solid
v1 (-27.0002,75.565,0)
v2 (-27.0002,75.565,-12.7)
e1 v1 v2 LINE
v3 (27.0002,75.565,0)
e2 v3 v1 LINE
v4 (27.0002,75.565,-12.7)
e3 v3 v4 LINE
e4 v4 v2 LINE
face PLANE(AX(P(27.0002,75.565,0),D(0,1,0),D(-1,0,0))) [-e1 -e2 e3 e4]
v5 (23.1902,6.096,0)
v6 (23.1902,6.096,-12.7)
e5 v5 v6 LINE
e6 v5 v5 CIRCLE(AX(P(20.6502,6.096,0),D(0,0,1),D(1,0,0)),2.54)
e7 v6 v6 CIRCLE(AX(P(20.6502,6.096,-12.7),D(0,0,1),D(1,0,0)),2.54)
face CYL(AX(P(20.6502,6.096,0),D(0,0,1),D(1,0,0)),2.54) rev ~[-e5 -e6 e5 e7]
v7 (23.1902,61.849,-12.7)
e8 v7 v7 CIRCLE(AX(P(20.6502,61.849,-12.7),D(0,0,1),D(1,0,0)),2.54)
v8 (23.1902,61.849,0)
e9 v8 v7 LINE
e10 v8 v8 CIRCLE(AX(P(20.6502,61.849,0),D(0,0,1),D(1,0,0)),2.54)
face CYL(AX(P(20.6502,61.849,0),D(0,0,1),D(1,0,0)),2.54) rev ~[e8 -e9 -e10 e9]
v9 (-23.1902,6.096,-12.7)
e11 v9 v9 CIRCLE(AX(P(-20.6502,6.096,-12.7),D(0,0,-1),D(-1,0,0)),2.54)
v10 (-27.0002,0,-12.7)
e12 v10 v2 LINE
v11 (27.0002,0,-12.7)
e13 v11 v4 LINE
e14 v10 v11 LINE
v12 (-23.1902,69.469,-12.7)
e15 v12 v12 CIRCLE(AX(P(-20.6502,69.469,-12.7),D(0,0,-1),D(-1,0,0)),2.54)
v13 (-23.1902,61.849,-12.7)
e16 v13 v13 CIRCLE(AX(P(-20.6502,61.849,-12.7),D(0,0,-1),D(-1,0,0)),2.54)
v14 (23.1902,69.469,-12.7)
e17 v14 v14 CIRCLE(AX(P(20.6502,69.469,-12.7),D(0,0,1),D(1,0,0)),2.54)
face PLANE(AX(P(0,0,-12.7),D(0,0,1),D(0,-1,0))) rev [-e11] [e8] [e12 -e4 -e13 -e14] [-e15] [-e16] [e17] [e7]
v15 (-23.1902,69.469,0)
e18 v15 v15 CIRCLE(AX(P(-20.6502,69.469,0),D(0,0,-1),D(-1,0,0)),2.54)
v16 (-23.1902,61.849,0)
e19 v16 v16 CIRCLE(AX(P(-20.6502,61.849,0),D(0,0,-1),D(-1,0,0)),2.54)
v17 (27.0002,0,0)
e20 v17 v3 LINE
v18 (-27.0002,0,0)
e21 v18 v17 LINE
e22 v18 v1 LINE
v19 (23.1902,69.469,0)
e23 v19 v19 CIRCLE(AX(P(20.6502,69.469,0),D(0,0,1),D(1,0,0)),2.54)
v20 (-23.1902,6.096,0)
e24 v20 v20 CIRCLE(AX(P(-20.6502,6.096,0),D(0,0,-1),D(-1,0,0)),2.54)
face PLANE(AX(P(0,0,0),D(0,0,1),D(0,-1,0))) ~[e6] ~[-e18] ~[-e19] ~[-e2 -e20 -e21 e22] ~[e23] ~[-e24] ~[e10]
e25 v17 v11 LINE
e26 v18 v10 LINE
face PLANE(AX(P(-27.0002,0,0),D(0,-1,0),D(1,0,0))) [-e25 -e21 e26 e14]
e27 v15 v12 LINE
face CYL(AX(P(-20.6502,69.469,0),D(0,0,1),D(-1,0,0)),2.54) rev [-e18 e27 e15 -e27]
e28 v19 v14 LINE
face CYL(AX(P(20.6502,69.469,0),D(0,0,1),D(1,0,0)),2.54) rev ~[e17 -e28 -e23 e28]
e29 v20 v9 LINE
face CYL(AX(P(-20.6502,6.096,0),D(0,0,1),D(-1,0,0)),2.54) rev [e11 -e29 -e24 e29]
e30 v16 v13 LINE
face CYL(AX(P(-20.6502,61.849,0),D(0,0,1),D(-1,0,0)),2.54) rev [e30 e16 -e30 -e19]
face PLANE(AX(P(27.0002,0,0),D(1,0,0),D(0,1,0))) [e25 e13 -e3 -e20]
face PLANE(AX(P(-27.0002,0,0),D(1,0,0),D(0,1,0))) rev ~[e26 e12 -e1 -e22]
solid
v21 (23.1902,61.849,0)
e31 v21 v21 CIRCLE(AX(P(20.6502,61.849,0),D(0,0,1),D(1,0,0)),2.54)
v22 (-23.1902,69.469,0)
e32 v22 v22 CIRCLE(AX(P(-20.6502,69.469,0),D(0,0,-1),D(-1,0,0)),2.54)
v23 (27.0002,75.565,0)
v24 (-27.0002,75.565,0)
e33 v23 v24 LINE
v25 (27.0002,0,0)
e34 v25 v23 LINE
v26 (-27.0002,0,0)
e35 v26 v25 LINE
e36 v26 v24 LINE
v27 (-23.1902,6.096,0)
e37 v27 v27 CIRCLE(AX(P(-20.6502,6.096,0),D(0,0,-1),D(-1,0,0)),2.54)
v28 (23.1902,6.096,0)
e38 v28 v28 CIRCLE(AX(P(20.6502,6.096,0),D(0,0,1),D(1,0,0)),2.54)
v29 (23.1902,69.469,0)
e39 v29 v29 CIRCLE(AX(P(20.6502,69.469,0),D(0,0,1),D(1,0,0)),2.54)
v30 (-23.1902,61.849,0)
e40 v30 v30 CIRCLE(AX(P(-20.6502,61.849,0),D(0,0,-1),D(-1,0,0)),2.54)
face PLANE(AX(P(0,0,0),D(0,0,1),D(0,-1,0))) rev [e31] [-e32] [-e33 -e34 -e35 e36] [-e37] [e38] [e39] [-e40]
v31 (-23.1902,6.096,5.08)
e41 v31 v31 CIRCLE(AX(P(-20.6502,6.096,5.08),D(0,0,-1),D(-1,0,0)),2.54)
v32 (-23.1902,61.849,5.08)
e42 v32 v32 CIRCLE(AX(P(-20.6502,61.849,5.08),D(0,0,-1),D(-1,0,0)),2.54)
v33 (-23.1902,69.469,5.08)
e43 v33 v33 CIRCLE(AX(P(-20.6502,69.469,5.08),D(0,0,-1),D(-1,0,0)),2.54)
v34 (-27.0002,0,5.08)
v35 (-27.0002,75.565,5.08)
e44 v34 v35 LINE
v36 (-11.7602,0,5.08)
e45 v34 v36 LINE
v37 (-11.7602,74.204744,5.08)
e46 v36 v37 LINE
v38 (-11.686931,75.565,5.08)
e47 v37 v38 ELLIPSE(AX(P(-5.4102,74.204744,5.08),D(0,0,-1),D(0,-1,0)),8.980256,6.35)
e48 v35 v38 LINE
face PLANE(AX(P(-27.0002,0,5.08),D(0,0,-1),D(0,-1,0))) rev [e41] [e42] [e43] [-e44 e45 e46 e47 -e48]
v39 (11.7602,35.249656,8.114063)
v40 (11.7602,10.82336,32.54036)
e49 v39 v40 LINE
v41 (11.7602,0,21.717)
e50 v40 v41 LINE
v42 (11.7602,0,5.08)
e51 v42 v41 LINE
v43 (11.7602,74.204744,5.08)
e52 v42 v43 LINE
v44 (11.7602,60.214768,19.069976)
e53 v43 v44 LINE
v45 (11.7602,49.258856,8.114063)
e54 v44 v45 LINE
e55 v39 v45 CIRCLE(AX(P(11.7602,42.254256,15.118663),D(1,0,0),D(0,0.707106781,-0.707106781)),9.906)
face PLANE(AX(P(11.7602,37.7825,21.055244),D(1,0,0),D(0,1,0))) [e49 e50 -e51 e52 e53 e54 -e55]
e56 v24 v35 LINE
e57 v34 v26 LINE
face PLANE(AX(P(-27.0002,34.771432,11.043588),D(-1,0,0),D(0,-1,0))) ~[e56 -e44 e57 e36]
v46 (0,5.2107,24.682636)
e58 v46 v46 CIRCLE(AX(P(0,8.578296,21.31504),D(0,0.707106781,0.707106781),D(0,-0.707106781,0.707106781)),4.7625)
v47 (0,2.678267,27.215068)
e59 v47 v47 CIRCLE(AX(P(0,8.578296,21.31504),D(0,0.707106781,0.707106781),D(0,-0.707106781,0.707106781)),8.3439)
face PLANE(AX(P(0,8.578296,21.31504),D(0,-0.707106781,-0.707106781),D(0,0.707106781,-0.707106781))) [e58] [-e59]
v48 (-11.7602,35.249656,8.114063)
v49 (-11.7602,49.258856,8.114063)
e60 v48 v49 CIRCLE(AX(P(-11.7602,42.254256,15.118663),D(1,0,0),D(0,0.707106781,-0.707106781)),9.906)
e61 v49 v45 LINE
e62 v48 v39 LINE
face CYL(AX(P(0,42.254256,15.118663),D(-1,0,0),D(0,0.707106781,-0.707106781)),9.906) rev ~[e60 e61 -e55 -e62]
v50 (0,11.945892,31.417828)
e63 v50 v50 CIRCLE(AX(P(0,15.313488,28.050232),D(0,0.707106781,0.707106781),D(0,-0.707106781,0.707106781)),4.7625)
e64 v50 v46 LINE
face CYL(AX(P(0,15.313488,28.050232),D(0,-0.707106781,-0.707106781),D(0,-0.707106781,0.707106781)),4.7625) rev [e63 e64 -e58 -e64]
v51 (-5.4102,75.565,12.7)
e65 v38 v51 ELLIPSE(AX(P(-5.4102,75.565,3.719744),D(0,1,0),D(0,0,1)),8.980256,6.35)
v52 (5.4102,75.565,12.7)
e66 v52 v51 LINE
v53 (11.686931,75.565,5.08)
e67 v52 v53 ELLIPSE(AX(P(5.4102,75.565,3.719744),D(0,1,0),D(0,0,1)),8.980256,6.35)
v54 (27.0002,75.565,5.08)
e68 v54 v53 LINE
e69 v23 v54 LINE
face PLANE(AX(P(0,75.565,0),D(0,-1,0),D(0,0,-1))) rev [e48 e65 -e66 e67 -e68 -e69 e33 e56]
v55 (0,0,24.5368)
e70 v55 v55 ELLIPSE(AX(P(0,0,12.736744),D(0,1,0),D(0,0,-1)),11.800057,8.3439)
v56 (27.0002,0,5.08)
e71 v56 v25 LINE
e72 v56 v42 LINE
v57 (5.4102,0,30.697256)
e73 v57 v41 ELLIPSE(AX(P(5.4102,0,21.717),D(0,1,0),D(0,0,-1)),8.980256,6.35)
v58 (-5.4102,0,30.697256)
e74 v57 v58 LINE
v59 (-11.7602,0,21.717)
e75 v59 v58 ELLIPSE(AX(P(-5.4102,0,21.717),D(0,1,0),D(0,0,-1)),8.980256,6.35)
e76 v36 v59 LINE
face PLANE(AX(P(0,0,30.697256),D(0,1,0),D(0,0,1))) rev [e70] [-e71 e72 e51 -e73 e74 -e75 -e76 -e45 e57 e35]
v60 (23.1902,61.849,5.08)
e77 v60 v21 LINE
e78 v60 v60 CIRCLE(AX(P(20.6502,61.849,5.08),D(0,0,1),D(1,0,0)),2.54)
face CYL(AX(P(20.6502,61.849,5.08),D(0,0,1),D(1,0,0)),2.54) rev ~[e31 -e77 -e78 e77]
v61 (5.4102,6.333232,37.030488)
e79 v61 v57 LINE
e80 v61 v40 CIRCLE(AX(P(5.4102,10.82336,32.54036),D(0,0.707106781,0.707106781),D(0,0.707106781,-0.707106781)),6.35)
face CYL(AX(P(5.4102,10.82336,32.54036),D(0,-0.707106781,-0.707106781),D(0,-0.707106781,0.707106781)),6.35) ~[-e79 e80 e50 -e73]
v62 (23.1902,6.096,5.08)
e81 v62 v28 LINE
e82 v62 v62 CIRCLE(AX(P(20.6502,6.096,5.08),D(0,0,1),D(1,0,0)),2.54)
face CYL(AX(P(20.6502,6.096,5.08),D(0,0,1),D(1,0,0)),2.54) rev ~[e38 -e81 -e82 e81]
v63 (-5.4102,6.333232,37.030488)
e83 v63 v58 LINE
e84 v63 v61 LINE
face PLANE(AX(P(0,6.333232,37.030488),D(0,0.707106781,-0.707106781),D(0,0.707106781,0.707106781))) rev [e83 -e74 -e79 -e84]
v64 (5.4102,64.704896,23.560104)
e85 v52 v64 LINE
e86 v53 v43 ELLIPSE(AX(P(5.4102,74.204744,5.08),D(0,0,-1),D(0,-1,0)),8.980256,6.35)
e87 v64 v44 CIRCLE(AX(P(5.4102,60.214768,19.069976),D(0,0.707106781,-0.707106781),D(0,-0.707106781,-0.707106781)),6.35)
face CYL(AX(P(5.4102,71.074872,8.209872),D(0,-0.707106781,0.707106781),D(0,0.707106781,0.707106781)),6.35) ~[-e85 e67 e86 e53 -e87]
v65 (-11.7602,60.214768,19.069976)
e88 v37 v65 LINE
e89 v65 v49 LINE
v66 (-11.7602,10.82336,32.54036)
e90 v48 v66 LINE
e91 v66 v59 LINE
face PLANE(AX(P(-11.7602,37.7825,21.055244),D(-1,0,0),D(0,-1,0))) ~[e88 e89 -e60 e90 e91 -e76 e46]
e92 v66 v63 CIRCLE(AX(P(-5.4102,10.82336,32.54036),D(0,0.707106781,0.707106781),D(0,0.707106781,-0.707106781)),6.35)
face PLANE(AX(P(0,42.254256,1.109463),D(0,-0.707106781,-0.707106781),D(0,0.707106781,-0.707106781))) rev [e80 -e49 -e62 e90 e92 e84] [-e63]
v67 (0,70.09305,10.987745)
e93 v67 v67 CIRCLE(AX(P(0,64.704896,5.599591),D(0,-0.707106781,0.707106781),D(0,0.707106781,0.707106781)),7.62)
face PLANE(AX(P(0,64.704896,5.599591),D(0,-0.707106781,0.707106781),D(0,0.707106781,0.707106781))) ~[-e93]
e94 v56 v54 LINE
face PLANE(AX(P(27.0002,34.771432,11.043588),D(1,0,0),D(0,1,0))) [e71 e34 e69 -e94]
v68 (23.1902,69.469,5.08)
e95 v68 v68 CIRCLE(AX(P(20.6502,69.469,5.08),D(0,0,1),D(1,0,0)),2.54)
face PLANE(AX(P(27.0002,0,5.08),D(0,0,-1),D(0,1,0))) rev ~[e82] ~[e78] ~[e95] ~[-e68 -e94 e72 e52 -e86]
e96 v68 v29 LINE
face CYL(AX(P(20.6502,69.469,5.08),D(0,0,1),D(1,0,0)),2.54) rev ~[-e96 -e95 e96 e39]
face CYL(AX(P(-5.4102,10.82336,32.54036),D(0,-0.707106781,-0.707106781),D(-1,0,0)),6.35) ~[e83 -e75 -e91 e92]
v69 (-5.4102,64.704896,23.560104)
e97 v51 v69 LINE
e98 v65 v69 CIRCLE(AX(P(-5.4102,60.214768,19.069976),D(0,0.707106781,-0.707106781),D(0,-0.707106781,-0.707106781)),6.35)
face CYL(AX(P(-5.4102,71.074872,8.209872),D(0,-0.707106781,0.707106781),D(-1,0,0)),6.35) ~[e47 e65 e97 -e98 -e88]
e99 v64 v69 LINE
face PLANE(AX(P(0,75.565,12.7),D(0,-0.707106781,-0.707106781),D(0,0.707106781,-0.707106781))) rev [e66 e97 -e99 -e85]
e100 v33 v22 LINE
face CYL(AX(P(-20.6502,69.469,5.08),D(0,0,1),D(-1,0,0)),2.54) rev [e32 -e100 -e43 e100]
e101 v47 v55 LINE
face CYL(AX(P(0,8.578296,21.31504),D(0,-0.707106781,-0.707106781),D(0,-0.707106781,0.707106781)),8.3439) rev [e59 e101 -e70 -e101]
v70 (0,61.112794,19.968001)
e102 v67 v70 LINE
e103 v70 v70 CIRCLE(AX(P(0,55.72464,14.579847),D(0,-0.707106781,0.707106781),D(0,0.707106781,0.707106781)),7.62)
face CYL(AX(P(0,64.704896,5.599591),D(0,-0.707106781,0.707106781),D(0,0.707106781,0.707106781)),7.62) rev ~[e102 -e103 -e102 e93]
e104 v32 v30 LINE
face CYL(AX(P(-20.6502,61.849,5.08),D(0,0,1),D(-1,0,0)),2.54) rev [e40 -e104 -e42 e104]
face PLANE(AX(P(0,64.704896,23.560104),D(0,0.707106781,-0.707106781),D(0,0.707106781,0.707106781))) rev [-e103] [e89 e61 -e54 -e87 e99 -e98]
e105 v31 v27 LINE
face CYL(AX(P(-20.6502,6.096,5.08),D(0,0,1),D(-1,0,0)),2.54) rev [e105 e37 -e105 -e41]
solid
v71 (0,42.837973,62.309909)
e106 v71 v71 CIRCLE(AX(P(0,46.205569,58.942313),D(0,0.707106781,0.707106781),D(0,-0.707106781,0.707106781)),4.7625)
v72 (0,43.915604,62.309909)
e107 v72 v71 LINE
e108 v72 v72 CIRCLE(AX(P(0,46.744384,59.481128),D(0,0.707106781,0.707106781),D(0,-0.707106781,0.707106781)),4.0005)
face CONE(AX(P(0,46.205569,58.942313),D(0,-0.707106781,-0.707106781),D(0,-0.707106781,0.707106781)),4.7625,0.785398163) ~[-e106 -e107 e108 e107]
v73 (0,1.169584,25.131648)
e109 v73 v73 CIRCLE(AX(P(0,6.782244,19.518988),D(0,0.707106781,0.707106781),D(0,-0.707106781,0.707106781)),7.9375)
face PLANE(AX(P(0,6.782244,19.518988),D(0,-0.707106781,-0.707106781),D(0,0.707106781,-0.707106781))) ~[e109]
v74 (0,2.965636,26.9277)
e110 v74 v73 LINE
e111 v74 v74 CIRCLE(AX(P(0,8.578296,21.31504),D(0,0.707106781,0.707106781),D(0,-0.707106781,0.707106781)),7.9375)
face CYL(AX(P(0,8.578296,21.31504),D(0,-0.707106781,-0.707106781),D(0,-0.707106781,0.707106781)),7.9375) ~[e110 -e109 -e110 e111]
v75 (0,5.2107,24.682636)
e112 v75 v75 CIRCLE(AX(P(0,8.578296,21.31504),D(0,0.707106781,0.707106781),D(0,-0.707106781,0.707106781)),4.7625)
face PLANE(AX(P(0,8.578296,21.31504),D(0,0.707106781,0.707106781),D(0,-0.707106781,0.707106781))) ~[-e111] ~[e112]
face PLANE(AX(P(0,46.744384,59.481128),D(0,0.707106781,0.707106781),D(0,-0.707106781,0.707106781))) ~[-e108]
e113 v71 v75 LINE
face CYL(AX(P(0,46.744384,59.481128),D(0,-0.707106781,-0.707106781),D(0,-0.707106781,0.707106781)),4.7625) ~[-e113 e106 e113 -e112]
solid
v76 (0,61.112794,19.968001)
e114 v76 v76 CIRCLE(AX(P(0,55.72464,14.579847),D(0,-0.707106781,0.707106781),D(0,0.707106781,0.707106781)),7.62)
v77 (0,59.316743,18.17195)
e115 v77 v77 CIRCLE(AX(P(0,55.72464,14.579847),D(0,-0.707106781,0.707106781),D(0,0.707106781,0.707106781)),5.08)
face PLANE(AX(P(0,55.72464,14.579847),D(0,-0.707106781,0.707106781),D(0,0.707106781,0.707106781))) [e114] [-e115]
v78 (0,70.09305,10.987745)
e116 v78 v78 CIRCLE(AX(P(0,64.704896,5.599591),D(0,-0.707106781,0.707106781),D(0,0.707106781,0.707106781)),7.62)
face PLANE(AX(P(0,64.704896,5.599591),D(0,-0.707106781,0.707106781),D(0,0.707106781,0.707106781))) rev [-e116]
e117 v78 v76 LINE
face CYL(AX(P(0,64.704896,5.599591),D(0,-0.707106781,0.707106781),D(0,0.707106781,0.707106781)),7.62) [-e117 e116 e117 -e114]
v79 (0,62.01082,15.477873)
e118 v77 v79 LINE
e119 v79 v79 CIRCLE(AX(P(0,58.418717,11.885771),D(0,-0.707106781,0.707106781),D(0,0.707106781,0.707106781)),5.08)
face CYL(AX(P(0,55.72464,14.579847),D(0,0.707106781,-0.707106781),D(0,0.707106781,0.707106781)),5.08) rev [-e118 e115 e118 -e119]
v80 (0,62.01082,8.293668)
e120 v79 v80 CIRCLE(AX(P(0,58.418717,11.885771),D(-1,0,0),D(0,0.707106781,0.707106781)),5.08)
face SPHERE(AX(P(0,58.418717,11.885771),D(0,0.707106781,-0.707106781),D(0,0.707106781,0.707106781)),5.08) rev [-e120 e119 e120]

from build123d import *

# Parameters (mm, degrees)
F1_DEPTH  = 27.0002
F2_R      = 9.906
F3_W      = 75.565
F3_H      = 31.9504877579
F4_DEPTH  = 15.24
F5_R      = 2.54
F6_DEPTH  = 5.081
F8_R      = 6.35
F13_SIZE  = 0.762
F16_DEPTH = 12.7


with BuildPart() as f1:
    # F0 (on Right) → F1 (new body)
    with BuildSketch(Plane.YZ):
        Polygon((0, 30.6972561211), (0, 0), (75.565, 0), (75.565, 12.7), (64.7048964237, 23.5601035763), (42.2542561211, 1.1094632736), (6.3332316368, 37.0304877579), align=None)
    extrude(amount=F1_DEPTH)

    # F2
    f2_edges = [f1.edges().sort_by_distance(p)[0] for p in [
        (13.5001, 42.254256, 1.109463),
    ]]
    fillet(f2_edges, radius=F2_R)

    # F3 (on face) → F4 (cut)
    with BuildSketch(Plane.YZ.offset(27.0002)):
        with Locations((37.7825, 21.0552438789)):
            Rectangle(F3_W, F3_H)
    extrude(amount=-F4_DEPTH, mode=Mode.SUBTRACT)

    # F5 (on face) → F6 (cut, through all)
    with BuildSketch(Plane.XY.offset(5.08)):
        with Locations((20.6502, 69.469)):
            Circle(F5_R)
        with Locations((20.6502, 61.849)):
            Circle(F5_R)
        with Locations((20.6502, 6.096)):
            Circle(F5_R)
    extrude(amount=-F6_DEPTH, mode=Mode.SUBTRACT)

    # F7: F1 across face


with BuildPart() as f1_1:
    add(f1.part)
    add(f1.part.mirror(Plane(origin=(0, 31.4297936493, 11.6265989231), x_dir=(0, 1, 0), z_dir=(-1, 0, 0))))

    # F8
    f8_edges = [f1_1.edges().sort_by_distance(p)[0] for p in [
        (-11.7602, 70.134948, 18.130052),
        (-11.7602, 3.166616, 33.863872),
        (11.7602, 3.166616, 33.863872),
        (11.7602, 70.134948, 18.130052),
    ]]
    fillet(f8_edges, radius=F8_R)

    # F9 (on Right) → F10 (revolve, cut)
    with BuildSketch(Plane.YZ):
        Polygon((-6.3683719395, 6.3683719395), (15.3134877579, 28.0502316368), (11.9458917125, 31.4178276822), (5.2106996217, 24.6826355914), (2.6782673955, 27.2150678175), (-12.268400211, 12.268400211), align=None)
    revolve(axis=Axis((0, 22.0486798487, 34.7854237276), (0, 0.7071067812, 0.7071067812)), mode=Mode.SUBTRACT)

    # F14 (on Right) → F15 (revolve, cut)
    with BuildSketch(Plane.YZ):
        Polygon((61.1127939753, 19.9680011278), (55.7246403027, 14.5798474552), (64.7048964237, 5.5995913341), (70.0930500964, 10.9877450068), align=None)
    revolve(axis=Axis((0, 60.2147683632, 10.0897193947), (0, -0.7071067812, 0.7071067812)), mode=Mode.SUBTRACT)


with BuildPart() as f12:
    # F11 (on Right) → F12 (revolve)
    with BuildSketch(Plane.YZ):
        Polygon((11.9458917125, 31.4178276822), (5.2106996217, 24.6826355914), (2.9656355914, 26.9276996217), (1.1695843672, 25.1316483974), (6.7822444428, 19.5189883218), (46.7443841816, 59.4811280605), (43.3767881362, 62.8487241059), align=None)
    revolve(axis=Axis((0, 26.7633143122, 39.5000581912), (0, 0.7071067812, 0.7071067812)))

    # F13
    f13_edges = [f12.edges().sort_by_distance(p)[0] for p in [
        (0, 50.11198, 56.113532),
    ]]
    chamfer(f13_edges, length=F13_SIZE)


with BuildPart() as f16:
    # F16 (new): a face of the model
    f16_faces = [f1_1.part.faces().sort_by_distance(p)[0] for p in [
        (0, 37.5360763609, 0),
    ]]
    extrude(f16_faces, amount=F16_DEPTH)


with BuildPart() as f18:
    # F17 (on Right) → F18 (revolve)
    with BuildSketch(Plane.YZ):
        with BuildLine():
            Line((59.3167427511, 18.1719499036), (62.0108195874, 15.4778730673))
            ThreePointArc((62.0108195874, 15.4778730673), (63.498717139, 11.8857706189), (62.0108195874, 8.2936681704))
            Line((62.0108195874, 8.2936681704), (64.7048964237, 5.5995913341))
            Line((64.7048964237, 5.5995913341), (70.0930500964, 10.9877450068))
            Line((70.0930500964, 10.9877450068), (61.1127939753, 19.9680011278))
            Line((61.1127939753, 19.9680011278), (59.3167427511, 18.1719499036))
        make_face()
    revolve(axis=Axis((0, 60.2147683632, 10.0897193947), (0, -0.7071067812, 0.7071067812)))


solid = Compound([f1_1.part, f12.part, f16.part, f18.part])
